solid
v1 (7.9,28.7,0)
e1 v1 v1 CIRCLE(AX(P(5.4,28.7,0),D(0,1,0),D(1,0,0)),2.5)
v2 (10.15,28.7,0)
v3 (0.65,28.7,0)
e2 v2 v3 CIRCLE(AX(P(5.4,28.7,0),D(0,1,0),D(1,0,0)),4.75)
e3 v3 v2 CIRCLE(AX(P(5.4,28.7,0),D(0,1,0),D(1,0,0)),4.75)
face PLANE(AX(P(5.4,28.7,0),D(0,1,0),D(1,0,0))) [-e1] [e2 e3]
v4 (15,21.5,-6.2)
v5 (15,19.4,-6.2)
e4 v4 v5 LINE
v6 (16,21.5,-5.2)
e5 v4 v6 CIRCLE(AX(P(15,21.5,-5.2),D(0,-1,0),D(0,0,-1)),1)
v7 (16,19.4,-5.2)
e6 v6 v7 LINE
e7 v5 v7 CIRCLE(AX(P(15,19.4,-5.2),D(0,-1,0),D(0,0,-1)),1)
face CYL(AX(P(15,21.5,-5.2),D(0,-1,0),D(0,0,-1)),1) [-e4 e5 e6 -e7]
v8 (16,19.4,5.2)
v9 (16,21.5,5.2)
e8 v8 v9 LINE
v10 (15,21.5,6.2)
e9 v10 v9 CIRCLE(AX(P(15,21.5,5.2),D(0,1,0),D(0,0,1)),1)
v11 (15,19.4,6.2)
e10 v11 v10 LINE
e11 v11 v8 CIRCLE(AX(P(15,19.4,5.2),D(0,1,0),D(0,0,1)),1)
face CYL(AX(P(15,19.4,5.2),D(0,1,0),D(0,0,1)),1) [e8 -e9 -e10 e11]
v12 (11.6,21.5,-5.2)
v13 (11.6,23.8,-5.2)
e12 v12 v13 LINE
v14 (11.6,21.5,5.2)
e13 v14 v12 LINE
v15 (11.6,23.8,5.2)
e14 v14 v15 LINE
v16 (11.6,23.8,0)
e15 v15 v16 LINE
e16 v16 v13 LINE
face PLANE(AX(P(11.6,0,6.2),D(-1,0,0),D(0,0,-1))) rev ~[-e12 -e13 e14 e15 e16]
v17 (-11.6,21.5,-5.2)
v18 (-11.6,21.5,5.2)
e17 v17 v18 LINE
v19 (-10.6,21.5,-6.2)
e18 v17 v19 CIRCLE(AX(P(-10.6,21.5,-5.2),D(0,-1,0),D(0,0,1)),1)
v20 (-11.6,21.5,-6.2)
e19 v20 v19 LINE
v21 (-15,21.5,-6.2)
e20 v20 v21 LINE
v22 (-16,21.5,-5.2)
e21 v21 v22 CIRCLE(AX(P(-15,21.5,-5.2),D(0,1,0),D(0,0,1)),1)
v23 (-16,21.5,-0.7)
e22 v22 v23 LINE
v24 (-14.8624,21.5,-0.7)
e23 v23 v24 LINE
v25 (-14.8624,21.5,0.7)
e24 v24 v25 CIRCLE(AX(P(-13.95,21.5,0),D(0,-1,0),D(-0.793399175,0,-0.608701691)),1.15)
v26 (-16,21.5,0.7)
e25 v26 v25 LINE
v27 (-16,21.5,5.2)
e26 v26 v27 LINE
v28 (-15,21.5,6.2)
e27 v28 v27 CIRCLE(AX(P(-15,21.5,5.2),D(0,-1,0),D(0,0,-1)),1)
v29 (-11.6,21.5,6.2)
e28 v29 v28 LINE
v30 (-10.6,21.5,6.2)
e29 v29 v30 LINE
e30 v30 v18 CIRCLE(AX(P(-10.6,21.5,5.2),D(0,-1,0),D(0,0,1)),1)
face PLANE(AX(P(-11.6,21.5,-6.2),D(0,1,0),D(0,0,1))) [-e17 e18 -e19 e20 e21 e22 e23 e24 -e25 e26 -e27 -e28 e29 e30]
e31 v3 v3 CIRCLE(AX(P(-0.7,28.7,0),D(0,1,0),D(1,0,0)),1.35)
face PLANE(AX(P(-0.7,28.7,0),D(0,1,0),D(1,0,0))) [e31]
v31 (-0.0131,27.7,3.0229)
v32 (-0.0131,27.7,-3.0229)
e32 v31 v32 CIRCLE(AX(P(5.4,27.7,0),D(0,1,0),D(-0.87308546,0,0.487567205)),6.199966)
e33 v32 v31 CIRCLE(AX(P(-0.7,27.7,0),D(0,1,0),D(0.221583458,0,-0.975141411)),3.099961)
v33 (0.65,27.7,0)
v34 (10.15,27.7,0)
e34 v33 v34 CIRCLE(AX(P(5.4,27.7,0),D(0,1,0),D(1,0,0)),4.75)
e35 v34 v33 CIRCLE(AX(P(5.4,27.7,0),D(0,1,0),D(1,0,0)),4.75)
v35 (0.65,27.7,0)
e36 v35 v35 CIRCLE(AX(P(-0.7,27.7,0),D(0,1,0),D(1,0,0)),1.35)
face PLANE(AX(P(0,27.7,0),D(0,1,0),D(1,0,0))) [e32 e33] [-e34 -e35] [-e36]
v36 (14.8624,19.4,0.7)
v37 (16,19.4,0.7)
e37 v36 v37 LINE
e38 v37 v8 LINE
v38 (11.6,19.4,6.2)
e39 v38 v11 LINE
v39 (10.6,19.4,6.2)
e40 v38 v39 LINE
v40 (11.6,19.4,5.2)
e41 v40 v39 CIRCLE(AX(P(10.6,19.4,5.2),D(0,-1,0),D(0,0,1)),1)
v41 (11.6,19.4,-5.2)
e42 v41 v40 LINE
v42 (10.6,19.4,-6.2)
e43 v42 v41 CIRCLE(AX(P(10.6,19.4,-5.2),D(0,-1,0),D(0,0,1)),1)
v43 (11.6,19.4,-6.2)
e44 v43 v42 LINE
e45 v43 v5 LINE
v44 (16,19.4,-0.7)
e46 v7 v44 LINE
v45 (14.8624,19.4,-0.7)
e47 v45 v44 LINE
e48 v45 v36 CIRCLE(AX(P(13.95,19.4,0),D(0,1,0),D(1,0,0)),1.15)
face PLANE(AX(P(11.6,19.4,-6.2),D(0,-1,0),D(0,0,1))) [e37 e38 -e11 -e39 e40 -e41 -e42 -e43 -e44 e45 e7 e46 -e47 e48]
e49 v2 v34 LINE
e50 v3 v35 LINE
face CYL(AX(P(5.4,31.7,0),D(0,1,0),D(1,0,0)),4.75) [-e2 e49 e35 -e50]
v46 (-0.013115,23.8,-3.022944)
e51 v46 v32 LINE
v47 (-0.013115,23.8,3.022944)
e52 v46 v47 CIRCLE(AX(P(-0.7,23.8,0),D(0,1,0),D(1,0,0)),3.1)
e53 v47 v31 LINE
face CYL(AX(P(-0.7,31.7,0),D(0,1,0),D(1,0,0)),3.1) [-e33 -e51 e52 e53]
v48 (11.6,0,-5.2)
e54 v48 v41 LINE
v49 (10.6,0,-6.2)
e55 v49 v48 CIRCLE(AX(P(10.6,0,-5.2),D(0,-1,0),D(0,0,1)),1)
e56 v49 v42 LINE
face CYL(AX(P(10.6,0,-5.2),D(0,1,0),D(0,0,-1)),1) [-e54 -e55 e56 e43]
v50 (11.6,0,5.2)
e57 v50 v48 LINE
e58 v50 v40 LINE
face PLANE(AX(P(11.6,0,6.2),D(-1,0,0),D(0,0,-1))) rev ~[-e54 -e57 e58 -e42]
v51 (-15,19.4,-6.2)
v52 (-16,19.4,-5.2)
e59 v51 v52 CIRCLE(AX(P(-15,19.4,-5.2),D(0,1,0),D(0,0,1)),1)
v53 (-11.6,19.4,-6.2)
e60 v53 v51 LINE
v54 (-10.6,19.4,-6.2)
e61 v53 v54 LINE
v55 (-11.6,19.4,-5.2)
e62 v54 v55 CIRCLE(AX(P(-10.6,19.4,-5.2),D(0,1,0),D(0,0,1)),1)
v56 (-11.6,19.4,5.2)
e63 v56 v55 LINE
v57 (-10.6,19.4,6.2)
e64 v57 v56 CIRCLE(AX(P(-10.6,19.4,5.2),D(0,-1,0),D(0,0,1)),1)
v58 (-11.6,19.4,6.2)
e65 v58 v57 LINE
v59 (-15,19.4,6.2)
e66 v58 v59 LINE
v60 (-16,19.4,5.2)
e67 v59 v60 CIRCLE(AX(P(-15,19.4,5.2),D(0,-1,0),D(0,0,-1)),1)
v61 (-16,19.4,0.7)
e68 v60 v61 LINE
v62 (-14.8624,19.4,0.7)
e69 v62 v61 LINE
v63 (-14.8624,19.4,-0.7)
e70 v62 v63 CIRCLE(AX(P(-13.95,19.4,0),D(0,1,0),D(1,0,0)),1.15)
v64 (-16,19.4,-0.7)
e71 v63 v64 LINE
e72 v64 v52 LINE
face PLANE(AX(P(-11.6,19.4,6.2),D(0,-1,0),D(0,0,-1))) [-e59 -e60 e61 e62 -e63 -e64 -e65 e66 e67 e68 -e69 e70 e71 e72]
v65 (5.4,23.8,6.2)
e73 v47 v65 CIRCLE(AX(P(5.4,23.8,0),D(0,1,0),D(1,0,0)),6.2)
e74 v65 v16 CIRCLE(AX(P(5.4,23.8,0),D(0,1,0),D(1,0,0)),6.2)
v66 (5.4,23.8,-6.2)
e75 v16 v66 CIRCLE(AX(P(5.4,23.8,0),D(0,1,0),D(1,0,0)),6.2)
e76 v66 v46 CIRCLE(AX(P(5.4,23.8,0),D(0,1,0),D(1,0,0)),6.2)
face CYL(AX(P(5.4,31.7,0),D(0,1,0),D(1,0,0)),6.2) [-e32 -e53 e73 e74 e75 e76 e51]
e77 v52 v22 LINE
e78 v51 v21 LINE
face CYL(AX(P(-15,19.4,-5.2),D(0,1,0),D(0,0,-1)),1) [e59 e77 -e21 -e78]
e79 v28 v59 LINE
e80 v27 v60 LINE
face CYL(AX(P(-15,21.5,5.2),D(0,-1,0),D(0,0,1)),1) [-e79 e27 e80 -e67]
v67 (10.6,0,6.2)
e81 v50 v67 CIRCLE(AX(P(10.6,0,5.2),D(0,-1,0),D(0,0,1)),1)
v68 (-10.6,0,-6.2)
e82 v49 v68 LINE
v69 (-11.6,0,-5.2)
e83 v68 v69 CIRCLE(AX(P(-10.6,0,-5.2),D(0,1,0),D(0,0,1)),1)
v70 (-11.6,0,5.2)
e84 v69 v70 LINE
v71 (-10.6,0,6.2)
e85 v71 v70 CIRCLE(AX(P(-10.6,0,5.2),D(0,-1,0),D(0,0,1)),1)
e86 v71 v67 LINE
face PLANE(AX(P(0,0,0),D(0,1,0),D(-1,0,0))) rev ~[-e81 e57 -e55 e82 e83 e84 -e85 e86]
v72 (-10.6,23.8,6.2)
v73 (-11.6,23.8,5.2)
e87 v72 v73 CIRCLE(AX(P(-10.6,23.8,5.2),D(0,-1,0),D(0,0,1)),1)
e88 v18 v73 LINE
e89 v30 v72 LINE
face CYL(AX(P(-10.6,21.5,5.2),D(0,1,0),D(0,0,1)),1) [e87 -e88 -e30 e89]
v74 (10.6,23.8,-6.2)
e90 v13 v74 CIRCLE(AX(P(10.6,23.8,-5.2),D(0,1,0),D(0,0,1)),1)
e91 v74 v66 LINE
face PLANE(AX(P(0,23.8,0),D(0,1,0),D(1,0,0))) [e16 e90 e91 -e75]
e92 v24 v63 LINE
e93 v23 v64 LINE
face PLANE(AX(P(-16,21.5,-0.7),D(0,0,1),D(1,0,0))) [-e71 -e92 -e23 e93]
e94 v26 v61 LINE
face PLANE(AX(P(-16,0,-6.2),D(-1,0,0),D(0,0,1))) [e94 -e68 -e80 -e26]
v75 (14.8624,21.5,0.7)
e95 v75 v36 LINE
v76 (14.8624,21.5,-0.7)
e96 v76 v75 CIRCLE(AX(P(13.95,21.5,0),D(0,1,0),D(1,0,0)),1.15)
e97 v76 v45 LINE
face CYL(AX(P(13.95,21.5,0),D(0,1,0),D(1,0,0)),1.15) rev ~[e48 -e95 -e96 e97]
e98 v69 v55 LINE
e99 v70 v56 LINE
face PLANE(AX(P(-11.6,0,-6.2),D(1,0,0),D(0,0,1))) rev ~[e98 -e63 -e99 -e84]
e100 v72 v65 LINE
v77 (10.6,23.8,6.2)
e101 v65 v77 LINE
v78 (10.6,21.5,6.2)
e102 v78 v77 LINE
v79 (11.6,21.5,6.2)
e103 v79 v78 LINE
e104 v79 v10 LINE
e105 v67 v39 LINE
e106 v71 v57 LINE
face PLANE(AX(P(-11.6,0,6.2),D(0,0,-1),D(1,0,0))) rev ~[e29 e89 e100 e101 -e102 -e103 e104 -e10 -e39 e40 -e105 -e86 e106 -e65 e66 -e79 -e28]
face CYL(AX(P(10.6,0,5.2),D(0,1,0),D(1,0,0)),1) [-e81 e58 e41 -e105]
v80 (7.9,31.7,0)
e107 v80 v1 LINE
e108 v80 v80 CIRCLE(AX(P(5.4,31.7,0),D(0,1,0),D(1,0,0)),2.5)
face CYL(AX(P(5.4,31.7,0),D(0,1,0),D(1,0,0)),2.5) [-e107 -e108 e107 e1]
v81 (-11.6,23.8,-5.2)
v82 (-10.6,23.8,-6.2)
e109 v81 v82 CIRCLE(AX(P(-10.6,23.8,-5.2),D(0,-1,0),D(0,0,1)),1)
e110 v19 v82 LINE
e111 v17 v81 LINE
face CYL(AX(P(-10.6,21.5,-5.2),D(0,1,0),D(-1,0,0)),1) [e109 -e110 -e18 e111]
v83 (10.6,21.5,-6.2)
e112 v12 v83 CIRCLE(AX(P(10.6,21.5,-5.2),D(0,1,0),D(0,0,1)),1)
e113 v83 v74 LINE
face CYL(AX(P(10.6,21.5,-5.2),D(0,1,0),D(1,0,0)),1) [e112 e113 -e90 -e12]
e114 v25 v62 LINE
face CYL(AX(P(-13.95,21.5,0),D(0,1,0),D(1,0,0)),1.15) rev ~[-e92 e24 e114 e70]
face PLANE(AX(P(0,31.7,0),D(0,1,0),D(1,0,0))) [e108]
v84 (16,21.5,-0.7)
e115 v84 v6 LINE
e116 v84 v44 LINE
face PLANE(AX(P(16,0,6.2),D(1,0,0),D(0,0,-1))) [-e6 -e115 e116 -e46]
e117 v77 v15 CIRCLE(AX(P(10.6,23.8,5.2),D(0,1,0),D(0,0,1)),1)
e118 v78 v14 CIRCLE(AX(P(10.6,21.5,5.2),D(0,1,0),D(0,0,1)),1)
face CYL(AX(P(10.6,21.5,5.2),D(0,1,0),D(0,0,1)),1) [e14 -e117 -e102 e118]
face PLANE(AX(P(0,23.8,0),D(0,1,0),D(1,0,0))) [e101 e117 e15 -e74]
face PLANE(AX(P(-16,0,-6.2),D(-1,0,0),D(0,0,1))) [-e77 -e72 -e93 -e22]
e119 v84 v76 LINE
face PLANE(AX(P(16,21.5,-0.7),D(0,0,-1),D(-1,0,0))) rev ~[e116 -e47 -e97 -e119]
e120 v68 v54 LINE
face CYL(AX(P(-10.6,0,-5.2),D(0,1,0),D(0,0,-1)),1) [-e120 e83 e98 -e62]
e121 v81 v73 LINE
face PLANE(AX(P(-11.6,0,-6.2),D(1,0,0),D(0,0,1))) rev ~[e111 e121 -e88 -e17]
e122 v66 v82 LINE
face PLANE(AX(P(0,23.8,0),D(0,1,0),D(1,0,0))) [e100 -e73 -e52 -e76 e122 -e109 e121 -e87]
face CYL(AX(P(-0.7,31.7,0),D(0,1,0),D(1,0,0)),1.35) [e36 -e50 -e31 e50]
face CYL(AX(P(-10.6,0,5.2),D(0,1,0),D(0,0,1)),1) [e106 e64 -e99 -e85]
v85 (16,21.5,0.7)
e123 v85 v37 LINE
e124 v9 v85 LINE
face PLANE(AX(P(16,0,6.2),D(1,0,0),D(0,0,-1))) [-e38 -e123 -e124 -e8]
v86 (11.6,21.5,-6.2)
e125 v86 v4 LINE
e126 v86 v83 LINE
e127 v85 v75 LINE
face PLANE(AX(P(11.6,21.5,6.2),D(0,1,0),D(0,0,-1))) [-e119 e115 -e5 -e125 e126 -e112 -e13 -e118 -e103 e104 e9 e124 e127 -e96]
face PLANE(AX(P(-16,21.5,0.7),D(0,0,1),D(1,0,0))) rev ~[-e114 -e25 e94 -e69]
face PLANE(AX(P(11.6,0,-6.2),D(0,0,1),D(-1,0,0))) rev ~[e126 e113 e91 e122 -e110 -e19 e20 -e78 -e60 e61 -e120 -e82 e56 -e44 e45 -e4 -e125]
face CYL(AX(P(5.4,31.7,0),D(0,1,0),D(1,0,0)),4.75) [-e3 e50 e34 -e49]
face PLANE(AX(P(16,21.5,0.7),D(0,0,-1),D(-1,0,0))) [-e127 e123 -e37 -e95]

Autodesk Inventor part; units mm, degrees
ref_plane "YZ Plane" through (0, 0, 0) normal (1, 0, 0) x (0, 1, 0)
ref_plane "XZ Plane" through (0, 0, 0) normal (0, 1, 0) x (-1, 0, 0)
ref_plane "XY Plane" through (0, 0, 0) normal (0, 0, 1) x (1, 0, 0)
sketch "Sketch1" plane through (0, 0, 0) normal (0, 1, 0) x (-1, 0, 0)
  line L0 (-11.6, -6.2) -> (11.6, -6.2)
  line L1 (11.6, -6.2) -> (11.6, 6.2)
  line L2 (11.6, 6.2) -> (-11.6, 6.2)
  line L3 (-11.6, 6.2) -> (-11.6, -6.2)
  line L4 (-11.6, -6.2) -> (11.6, 6.2) construction
  line L5 (11.6, -6.2) -> (-11.6, 6.2) construction
  point P0 (0, 0)
extrude "Extrusion1" add sketch "Sketch1" along normal blind 31.7
sketch "Sketch2" plane through (11.6, 0, 6.2) normal (1, 0, 0) x (0, 0, -1)
  line L0 (12.4, 19.4) -> (0, 19.4)
  line L1 (0, 19.4) -> (0, 21.5)
  line L2 (0, 21.5) -> (12.4, 21.5)
  line L3 (12.4, 21.5) -> (12.4, 19.4)
extrude "Extrusion2" add sketch "Sketch2" along normal blind 4.4
sketch "Sketch8" plane through (-11.6, 0, -6.2) normal (-1, 0, 0) x (0, 0, 1)
  line L0 (12.4, 19.4) -> (0, 19.4)
  line L1 (0, 19.4) -> (0, 21.5)
  line L2 (0, 21.5) -> (12.4, 21.5)
  line L3 (12.4, 21.5) -> (12.4, 19.4)
  point P0 (12.4, 0)
  point P1 (6.2, 0)
extrude "Extrusion3" add sketch "Sketch8" along normal blind 4.4
sketch "Sketch10" plane through (0, 31.7, 0) normal (0, 1, 0) x (1, 0, 0)
  circle A0 centre (5.4, 0) radius 6.2
sketch "Sketch11" plane through (0, 31.7, 0) normal (0, 1, 0) x (1, 0, 0)
  circle A0 centre (-0.7, 0) radius 3.1
  point P0 (0, 0)
sketch "Sketch12" plane through (0, 31.7, 0) normal (0, 1, 0) x (1, 0, 0)
  line L0 (11.6, 6.2) -> (-11.6, 6.2) projected
  line L1 (-11.6, 6.2) -> (-11.6, -6.2) projected
  line L2 (-11.6, -6.2) -> (11.6, -6.2) projected
  line L3 (11.6, -6.2) -> (11.6, 6.2) projected
  point P0 (0, 0)
extrude "Extrusion4" cut sketch "Sketch12" against normal blind 7.9
extrude "Extrusion5" add sketch "Sketch10" against normal blind 7.9
extrude "Extrusion6" add sketch "Sketch11" against normal blind 7.9
sketch "Sketch13" plane through (0, 31.7, 0) normal (0, 1, 0) x (1, 0, 0)
  arc A0 (-0.0131, -3.0229) -> (-0.0131, 3.0229) centre (5.4, 0) ccw projected
  arc A1 (-0.0131, 3.0229) -> (-0.0131, -3.0229) centre (-0.7, 0) ccw projected
  circle A2 centre (5.4, 0) radius 4.75
  circle A3 centre (-0.7, 0) radius 1.35
extrude "Extrusion7" cut sketch "Sketch13" against normal blind 4
sketch "Sketch14" plane through (5.4, 31.7, 0) normal (0, 1, 0) x (1, 0, 0)
  circle A0 centre (0, 0) radius 4.75 projected
  circle A1 centre (0, 0) radius 2.5
  point P0 (-4.75, 0)
  point P1 (-5.4, 0)
  dimension "d28" = 5
extrude "Extrusion8" cut sketch "Sketch14" against normal blind 3
sketch "Sketch15" plane through (-0.7, 31.7, 0) normal (0, 1, 0) x (1, 0, 0)
  circle A0 centre (0, 0) radius 1.35 projected
extrude "Extrusion9" cut sketch "Sketch15" against normal blind 3
sketch "Sketch16" plane through (11.6, 21.5, 6.2) normal (0, 1, 0) x (1, 0, 0)
  circle A0 centre (2.35, 6.2) radius 1.15
  line L0 (4.4, 6.2) -> (4.4, 5.5)
  line L1 (4.4, 5.5) -> (3.2624, 5.5)
  line L2 (4.4, 6.2) -> (4.4, 6.9)
  line L3 (4.4, 6.9) -> (3.2624, 6.9)
  point P0 (-11.6, 6.2)
sketch "Sketch17" plane through (-11.6, 21.5, 6.2) normal (0, 1, 0) x (1, 0, 0)
  circle A0 centre (-2.35, 6.2) radius 1.15
  line L0 (-4.4, 6.2) -> (-4.4, 6.9)
  line L1 (-4.4, 6.9) -> (-3.2624, 6.9)
  line L2 (-4.4, 6.2) -> (-4.4, 5.5)
  line L3 (-4.4, 5.5) -> (-3.2624, 5.5)
  point P0 (11.6, 6.2)
sketch "Sketch18" plane through (-11.6, 21.5, 6.2) normal (0, 1, 0) x (1, 0, 0)
  point P0 (11.6, 6.2)
extrude "Extrusion10" cut sketch "Sketch17" against normal blind 3
extrude "Extrusion11" cut sketch "Sketch16" against normal blind 3
fillet "Fillet1" radius 1 1 edges at (-16, 20.45, -6.2)
sketch "Sketch20" plane through (-11.6, 21.5, 6.2) normal (0, 1, 0) x (1, 0, 0)
  point P0 (11.6, 6.2)
fillet "Fillet2" radius 1 1 edges at (16, 20.45, -6.2)
fillet "Fillet3" radius 1 1 edges at (-16, 20.45, 6.2)
fillet "Fillet4" radius 1 1 edges at (16, 20.45, 6.2)
fillet "Fillet5" radius 1 1 edges at (11.6, 22.65, 6.2)
fillet "Fillet6" radius 1 1 edges at (11.6, 22.65, -6.2)
fillet "Fillet7" radius 1 1 edges at (-11.6, 22.65, 6.2)
fillet "Fillet8" radius 1 1 edges at (-11.6, 22.65, -6.2)
fillet "Fillet9" radius 1 1 edges at (-11.6, 9.7, -6.2)
fillet "Fillet10" radius 1 1 edges at (11.6, 9.7, -6.2)
fillet "Fillet11" radius 1 1 edges at (11.6, 9.7, 6.2)
fillet "Fillet12" radius 1 1 edges at (-11.6, 9.7, 6.2)
properties part number "micro_servo"
